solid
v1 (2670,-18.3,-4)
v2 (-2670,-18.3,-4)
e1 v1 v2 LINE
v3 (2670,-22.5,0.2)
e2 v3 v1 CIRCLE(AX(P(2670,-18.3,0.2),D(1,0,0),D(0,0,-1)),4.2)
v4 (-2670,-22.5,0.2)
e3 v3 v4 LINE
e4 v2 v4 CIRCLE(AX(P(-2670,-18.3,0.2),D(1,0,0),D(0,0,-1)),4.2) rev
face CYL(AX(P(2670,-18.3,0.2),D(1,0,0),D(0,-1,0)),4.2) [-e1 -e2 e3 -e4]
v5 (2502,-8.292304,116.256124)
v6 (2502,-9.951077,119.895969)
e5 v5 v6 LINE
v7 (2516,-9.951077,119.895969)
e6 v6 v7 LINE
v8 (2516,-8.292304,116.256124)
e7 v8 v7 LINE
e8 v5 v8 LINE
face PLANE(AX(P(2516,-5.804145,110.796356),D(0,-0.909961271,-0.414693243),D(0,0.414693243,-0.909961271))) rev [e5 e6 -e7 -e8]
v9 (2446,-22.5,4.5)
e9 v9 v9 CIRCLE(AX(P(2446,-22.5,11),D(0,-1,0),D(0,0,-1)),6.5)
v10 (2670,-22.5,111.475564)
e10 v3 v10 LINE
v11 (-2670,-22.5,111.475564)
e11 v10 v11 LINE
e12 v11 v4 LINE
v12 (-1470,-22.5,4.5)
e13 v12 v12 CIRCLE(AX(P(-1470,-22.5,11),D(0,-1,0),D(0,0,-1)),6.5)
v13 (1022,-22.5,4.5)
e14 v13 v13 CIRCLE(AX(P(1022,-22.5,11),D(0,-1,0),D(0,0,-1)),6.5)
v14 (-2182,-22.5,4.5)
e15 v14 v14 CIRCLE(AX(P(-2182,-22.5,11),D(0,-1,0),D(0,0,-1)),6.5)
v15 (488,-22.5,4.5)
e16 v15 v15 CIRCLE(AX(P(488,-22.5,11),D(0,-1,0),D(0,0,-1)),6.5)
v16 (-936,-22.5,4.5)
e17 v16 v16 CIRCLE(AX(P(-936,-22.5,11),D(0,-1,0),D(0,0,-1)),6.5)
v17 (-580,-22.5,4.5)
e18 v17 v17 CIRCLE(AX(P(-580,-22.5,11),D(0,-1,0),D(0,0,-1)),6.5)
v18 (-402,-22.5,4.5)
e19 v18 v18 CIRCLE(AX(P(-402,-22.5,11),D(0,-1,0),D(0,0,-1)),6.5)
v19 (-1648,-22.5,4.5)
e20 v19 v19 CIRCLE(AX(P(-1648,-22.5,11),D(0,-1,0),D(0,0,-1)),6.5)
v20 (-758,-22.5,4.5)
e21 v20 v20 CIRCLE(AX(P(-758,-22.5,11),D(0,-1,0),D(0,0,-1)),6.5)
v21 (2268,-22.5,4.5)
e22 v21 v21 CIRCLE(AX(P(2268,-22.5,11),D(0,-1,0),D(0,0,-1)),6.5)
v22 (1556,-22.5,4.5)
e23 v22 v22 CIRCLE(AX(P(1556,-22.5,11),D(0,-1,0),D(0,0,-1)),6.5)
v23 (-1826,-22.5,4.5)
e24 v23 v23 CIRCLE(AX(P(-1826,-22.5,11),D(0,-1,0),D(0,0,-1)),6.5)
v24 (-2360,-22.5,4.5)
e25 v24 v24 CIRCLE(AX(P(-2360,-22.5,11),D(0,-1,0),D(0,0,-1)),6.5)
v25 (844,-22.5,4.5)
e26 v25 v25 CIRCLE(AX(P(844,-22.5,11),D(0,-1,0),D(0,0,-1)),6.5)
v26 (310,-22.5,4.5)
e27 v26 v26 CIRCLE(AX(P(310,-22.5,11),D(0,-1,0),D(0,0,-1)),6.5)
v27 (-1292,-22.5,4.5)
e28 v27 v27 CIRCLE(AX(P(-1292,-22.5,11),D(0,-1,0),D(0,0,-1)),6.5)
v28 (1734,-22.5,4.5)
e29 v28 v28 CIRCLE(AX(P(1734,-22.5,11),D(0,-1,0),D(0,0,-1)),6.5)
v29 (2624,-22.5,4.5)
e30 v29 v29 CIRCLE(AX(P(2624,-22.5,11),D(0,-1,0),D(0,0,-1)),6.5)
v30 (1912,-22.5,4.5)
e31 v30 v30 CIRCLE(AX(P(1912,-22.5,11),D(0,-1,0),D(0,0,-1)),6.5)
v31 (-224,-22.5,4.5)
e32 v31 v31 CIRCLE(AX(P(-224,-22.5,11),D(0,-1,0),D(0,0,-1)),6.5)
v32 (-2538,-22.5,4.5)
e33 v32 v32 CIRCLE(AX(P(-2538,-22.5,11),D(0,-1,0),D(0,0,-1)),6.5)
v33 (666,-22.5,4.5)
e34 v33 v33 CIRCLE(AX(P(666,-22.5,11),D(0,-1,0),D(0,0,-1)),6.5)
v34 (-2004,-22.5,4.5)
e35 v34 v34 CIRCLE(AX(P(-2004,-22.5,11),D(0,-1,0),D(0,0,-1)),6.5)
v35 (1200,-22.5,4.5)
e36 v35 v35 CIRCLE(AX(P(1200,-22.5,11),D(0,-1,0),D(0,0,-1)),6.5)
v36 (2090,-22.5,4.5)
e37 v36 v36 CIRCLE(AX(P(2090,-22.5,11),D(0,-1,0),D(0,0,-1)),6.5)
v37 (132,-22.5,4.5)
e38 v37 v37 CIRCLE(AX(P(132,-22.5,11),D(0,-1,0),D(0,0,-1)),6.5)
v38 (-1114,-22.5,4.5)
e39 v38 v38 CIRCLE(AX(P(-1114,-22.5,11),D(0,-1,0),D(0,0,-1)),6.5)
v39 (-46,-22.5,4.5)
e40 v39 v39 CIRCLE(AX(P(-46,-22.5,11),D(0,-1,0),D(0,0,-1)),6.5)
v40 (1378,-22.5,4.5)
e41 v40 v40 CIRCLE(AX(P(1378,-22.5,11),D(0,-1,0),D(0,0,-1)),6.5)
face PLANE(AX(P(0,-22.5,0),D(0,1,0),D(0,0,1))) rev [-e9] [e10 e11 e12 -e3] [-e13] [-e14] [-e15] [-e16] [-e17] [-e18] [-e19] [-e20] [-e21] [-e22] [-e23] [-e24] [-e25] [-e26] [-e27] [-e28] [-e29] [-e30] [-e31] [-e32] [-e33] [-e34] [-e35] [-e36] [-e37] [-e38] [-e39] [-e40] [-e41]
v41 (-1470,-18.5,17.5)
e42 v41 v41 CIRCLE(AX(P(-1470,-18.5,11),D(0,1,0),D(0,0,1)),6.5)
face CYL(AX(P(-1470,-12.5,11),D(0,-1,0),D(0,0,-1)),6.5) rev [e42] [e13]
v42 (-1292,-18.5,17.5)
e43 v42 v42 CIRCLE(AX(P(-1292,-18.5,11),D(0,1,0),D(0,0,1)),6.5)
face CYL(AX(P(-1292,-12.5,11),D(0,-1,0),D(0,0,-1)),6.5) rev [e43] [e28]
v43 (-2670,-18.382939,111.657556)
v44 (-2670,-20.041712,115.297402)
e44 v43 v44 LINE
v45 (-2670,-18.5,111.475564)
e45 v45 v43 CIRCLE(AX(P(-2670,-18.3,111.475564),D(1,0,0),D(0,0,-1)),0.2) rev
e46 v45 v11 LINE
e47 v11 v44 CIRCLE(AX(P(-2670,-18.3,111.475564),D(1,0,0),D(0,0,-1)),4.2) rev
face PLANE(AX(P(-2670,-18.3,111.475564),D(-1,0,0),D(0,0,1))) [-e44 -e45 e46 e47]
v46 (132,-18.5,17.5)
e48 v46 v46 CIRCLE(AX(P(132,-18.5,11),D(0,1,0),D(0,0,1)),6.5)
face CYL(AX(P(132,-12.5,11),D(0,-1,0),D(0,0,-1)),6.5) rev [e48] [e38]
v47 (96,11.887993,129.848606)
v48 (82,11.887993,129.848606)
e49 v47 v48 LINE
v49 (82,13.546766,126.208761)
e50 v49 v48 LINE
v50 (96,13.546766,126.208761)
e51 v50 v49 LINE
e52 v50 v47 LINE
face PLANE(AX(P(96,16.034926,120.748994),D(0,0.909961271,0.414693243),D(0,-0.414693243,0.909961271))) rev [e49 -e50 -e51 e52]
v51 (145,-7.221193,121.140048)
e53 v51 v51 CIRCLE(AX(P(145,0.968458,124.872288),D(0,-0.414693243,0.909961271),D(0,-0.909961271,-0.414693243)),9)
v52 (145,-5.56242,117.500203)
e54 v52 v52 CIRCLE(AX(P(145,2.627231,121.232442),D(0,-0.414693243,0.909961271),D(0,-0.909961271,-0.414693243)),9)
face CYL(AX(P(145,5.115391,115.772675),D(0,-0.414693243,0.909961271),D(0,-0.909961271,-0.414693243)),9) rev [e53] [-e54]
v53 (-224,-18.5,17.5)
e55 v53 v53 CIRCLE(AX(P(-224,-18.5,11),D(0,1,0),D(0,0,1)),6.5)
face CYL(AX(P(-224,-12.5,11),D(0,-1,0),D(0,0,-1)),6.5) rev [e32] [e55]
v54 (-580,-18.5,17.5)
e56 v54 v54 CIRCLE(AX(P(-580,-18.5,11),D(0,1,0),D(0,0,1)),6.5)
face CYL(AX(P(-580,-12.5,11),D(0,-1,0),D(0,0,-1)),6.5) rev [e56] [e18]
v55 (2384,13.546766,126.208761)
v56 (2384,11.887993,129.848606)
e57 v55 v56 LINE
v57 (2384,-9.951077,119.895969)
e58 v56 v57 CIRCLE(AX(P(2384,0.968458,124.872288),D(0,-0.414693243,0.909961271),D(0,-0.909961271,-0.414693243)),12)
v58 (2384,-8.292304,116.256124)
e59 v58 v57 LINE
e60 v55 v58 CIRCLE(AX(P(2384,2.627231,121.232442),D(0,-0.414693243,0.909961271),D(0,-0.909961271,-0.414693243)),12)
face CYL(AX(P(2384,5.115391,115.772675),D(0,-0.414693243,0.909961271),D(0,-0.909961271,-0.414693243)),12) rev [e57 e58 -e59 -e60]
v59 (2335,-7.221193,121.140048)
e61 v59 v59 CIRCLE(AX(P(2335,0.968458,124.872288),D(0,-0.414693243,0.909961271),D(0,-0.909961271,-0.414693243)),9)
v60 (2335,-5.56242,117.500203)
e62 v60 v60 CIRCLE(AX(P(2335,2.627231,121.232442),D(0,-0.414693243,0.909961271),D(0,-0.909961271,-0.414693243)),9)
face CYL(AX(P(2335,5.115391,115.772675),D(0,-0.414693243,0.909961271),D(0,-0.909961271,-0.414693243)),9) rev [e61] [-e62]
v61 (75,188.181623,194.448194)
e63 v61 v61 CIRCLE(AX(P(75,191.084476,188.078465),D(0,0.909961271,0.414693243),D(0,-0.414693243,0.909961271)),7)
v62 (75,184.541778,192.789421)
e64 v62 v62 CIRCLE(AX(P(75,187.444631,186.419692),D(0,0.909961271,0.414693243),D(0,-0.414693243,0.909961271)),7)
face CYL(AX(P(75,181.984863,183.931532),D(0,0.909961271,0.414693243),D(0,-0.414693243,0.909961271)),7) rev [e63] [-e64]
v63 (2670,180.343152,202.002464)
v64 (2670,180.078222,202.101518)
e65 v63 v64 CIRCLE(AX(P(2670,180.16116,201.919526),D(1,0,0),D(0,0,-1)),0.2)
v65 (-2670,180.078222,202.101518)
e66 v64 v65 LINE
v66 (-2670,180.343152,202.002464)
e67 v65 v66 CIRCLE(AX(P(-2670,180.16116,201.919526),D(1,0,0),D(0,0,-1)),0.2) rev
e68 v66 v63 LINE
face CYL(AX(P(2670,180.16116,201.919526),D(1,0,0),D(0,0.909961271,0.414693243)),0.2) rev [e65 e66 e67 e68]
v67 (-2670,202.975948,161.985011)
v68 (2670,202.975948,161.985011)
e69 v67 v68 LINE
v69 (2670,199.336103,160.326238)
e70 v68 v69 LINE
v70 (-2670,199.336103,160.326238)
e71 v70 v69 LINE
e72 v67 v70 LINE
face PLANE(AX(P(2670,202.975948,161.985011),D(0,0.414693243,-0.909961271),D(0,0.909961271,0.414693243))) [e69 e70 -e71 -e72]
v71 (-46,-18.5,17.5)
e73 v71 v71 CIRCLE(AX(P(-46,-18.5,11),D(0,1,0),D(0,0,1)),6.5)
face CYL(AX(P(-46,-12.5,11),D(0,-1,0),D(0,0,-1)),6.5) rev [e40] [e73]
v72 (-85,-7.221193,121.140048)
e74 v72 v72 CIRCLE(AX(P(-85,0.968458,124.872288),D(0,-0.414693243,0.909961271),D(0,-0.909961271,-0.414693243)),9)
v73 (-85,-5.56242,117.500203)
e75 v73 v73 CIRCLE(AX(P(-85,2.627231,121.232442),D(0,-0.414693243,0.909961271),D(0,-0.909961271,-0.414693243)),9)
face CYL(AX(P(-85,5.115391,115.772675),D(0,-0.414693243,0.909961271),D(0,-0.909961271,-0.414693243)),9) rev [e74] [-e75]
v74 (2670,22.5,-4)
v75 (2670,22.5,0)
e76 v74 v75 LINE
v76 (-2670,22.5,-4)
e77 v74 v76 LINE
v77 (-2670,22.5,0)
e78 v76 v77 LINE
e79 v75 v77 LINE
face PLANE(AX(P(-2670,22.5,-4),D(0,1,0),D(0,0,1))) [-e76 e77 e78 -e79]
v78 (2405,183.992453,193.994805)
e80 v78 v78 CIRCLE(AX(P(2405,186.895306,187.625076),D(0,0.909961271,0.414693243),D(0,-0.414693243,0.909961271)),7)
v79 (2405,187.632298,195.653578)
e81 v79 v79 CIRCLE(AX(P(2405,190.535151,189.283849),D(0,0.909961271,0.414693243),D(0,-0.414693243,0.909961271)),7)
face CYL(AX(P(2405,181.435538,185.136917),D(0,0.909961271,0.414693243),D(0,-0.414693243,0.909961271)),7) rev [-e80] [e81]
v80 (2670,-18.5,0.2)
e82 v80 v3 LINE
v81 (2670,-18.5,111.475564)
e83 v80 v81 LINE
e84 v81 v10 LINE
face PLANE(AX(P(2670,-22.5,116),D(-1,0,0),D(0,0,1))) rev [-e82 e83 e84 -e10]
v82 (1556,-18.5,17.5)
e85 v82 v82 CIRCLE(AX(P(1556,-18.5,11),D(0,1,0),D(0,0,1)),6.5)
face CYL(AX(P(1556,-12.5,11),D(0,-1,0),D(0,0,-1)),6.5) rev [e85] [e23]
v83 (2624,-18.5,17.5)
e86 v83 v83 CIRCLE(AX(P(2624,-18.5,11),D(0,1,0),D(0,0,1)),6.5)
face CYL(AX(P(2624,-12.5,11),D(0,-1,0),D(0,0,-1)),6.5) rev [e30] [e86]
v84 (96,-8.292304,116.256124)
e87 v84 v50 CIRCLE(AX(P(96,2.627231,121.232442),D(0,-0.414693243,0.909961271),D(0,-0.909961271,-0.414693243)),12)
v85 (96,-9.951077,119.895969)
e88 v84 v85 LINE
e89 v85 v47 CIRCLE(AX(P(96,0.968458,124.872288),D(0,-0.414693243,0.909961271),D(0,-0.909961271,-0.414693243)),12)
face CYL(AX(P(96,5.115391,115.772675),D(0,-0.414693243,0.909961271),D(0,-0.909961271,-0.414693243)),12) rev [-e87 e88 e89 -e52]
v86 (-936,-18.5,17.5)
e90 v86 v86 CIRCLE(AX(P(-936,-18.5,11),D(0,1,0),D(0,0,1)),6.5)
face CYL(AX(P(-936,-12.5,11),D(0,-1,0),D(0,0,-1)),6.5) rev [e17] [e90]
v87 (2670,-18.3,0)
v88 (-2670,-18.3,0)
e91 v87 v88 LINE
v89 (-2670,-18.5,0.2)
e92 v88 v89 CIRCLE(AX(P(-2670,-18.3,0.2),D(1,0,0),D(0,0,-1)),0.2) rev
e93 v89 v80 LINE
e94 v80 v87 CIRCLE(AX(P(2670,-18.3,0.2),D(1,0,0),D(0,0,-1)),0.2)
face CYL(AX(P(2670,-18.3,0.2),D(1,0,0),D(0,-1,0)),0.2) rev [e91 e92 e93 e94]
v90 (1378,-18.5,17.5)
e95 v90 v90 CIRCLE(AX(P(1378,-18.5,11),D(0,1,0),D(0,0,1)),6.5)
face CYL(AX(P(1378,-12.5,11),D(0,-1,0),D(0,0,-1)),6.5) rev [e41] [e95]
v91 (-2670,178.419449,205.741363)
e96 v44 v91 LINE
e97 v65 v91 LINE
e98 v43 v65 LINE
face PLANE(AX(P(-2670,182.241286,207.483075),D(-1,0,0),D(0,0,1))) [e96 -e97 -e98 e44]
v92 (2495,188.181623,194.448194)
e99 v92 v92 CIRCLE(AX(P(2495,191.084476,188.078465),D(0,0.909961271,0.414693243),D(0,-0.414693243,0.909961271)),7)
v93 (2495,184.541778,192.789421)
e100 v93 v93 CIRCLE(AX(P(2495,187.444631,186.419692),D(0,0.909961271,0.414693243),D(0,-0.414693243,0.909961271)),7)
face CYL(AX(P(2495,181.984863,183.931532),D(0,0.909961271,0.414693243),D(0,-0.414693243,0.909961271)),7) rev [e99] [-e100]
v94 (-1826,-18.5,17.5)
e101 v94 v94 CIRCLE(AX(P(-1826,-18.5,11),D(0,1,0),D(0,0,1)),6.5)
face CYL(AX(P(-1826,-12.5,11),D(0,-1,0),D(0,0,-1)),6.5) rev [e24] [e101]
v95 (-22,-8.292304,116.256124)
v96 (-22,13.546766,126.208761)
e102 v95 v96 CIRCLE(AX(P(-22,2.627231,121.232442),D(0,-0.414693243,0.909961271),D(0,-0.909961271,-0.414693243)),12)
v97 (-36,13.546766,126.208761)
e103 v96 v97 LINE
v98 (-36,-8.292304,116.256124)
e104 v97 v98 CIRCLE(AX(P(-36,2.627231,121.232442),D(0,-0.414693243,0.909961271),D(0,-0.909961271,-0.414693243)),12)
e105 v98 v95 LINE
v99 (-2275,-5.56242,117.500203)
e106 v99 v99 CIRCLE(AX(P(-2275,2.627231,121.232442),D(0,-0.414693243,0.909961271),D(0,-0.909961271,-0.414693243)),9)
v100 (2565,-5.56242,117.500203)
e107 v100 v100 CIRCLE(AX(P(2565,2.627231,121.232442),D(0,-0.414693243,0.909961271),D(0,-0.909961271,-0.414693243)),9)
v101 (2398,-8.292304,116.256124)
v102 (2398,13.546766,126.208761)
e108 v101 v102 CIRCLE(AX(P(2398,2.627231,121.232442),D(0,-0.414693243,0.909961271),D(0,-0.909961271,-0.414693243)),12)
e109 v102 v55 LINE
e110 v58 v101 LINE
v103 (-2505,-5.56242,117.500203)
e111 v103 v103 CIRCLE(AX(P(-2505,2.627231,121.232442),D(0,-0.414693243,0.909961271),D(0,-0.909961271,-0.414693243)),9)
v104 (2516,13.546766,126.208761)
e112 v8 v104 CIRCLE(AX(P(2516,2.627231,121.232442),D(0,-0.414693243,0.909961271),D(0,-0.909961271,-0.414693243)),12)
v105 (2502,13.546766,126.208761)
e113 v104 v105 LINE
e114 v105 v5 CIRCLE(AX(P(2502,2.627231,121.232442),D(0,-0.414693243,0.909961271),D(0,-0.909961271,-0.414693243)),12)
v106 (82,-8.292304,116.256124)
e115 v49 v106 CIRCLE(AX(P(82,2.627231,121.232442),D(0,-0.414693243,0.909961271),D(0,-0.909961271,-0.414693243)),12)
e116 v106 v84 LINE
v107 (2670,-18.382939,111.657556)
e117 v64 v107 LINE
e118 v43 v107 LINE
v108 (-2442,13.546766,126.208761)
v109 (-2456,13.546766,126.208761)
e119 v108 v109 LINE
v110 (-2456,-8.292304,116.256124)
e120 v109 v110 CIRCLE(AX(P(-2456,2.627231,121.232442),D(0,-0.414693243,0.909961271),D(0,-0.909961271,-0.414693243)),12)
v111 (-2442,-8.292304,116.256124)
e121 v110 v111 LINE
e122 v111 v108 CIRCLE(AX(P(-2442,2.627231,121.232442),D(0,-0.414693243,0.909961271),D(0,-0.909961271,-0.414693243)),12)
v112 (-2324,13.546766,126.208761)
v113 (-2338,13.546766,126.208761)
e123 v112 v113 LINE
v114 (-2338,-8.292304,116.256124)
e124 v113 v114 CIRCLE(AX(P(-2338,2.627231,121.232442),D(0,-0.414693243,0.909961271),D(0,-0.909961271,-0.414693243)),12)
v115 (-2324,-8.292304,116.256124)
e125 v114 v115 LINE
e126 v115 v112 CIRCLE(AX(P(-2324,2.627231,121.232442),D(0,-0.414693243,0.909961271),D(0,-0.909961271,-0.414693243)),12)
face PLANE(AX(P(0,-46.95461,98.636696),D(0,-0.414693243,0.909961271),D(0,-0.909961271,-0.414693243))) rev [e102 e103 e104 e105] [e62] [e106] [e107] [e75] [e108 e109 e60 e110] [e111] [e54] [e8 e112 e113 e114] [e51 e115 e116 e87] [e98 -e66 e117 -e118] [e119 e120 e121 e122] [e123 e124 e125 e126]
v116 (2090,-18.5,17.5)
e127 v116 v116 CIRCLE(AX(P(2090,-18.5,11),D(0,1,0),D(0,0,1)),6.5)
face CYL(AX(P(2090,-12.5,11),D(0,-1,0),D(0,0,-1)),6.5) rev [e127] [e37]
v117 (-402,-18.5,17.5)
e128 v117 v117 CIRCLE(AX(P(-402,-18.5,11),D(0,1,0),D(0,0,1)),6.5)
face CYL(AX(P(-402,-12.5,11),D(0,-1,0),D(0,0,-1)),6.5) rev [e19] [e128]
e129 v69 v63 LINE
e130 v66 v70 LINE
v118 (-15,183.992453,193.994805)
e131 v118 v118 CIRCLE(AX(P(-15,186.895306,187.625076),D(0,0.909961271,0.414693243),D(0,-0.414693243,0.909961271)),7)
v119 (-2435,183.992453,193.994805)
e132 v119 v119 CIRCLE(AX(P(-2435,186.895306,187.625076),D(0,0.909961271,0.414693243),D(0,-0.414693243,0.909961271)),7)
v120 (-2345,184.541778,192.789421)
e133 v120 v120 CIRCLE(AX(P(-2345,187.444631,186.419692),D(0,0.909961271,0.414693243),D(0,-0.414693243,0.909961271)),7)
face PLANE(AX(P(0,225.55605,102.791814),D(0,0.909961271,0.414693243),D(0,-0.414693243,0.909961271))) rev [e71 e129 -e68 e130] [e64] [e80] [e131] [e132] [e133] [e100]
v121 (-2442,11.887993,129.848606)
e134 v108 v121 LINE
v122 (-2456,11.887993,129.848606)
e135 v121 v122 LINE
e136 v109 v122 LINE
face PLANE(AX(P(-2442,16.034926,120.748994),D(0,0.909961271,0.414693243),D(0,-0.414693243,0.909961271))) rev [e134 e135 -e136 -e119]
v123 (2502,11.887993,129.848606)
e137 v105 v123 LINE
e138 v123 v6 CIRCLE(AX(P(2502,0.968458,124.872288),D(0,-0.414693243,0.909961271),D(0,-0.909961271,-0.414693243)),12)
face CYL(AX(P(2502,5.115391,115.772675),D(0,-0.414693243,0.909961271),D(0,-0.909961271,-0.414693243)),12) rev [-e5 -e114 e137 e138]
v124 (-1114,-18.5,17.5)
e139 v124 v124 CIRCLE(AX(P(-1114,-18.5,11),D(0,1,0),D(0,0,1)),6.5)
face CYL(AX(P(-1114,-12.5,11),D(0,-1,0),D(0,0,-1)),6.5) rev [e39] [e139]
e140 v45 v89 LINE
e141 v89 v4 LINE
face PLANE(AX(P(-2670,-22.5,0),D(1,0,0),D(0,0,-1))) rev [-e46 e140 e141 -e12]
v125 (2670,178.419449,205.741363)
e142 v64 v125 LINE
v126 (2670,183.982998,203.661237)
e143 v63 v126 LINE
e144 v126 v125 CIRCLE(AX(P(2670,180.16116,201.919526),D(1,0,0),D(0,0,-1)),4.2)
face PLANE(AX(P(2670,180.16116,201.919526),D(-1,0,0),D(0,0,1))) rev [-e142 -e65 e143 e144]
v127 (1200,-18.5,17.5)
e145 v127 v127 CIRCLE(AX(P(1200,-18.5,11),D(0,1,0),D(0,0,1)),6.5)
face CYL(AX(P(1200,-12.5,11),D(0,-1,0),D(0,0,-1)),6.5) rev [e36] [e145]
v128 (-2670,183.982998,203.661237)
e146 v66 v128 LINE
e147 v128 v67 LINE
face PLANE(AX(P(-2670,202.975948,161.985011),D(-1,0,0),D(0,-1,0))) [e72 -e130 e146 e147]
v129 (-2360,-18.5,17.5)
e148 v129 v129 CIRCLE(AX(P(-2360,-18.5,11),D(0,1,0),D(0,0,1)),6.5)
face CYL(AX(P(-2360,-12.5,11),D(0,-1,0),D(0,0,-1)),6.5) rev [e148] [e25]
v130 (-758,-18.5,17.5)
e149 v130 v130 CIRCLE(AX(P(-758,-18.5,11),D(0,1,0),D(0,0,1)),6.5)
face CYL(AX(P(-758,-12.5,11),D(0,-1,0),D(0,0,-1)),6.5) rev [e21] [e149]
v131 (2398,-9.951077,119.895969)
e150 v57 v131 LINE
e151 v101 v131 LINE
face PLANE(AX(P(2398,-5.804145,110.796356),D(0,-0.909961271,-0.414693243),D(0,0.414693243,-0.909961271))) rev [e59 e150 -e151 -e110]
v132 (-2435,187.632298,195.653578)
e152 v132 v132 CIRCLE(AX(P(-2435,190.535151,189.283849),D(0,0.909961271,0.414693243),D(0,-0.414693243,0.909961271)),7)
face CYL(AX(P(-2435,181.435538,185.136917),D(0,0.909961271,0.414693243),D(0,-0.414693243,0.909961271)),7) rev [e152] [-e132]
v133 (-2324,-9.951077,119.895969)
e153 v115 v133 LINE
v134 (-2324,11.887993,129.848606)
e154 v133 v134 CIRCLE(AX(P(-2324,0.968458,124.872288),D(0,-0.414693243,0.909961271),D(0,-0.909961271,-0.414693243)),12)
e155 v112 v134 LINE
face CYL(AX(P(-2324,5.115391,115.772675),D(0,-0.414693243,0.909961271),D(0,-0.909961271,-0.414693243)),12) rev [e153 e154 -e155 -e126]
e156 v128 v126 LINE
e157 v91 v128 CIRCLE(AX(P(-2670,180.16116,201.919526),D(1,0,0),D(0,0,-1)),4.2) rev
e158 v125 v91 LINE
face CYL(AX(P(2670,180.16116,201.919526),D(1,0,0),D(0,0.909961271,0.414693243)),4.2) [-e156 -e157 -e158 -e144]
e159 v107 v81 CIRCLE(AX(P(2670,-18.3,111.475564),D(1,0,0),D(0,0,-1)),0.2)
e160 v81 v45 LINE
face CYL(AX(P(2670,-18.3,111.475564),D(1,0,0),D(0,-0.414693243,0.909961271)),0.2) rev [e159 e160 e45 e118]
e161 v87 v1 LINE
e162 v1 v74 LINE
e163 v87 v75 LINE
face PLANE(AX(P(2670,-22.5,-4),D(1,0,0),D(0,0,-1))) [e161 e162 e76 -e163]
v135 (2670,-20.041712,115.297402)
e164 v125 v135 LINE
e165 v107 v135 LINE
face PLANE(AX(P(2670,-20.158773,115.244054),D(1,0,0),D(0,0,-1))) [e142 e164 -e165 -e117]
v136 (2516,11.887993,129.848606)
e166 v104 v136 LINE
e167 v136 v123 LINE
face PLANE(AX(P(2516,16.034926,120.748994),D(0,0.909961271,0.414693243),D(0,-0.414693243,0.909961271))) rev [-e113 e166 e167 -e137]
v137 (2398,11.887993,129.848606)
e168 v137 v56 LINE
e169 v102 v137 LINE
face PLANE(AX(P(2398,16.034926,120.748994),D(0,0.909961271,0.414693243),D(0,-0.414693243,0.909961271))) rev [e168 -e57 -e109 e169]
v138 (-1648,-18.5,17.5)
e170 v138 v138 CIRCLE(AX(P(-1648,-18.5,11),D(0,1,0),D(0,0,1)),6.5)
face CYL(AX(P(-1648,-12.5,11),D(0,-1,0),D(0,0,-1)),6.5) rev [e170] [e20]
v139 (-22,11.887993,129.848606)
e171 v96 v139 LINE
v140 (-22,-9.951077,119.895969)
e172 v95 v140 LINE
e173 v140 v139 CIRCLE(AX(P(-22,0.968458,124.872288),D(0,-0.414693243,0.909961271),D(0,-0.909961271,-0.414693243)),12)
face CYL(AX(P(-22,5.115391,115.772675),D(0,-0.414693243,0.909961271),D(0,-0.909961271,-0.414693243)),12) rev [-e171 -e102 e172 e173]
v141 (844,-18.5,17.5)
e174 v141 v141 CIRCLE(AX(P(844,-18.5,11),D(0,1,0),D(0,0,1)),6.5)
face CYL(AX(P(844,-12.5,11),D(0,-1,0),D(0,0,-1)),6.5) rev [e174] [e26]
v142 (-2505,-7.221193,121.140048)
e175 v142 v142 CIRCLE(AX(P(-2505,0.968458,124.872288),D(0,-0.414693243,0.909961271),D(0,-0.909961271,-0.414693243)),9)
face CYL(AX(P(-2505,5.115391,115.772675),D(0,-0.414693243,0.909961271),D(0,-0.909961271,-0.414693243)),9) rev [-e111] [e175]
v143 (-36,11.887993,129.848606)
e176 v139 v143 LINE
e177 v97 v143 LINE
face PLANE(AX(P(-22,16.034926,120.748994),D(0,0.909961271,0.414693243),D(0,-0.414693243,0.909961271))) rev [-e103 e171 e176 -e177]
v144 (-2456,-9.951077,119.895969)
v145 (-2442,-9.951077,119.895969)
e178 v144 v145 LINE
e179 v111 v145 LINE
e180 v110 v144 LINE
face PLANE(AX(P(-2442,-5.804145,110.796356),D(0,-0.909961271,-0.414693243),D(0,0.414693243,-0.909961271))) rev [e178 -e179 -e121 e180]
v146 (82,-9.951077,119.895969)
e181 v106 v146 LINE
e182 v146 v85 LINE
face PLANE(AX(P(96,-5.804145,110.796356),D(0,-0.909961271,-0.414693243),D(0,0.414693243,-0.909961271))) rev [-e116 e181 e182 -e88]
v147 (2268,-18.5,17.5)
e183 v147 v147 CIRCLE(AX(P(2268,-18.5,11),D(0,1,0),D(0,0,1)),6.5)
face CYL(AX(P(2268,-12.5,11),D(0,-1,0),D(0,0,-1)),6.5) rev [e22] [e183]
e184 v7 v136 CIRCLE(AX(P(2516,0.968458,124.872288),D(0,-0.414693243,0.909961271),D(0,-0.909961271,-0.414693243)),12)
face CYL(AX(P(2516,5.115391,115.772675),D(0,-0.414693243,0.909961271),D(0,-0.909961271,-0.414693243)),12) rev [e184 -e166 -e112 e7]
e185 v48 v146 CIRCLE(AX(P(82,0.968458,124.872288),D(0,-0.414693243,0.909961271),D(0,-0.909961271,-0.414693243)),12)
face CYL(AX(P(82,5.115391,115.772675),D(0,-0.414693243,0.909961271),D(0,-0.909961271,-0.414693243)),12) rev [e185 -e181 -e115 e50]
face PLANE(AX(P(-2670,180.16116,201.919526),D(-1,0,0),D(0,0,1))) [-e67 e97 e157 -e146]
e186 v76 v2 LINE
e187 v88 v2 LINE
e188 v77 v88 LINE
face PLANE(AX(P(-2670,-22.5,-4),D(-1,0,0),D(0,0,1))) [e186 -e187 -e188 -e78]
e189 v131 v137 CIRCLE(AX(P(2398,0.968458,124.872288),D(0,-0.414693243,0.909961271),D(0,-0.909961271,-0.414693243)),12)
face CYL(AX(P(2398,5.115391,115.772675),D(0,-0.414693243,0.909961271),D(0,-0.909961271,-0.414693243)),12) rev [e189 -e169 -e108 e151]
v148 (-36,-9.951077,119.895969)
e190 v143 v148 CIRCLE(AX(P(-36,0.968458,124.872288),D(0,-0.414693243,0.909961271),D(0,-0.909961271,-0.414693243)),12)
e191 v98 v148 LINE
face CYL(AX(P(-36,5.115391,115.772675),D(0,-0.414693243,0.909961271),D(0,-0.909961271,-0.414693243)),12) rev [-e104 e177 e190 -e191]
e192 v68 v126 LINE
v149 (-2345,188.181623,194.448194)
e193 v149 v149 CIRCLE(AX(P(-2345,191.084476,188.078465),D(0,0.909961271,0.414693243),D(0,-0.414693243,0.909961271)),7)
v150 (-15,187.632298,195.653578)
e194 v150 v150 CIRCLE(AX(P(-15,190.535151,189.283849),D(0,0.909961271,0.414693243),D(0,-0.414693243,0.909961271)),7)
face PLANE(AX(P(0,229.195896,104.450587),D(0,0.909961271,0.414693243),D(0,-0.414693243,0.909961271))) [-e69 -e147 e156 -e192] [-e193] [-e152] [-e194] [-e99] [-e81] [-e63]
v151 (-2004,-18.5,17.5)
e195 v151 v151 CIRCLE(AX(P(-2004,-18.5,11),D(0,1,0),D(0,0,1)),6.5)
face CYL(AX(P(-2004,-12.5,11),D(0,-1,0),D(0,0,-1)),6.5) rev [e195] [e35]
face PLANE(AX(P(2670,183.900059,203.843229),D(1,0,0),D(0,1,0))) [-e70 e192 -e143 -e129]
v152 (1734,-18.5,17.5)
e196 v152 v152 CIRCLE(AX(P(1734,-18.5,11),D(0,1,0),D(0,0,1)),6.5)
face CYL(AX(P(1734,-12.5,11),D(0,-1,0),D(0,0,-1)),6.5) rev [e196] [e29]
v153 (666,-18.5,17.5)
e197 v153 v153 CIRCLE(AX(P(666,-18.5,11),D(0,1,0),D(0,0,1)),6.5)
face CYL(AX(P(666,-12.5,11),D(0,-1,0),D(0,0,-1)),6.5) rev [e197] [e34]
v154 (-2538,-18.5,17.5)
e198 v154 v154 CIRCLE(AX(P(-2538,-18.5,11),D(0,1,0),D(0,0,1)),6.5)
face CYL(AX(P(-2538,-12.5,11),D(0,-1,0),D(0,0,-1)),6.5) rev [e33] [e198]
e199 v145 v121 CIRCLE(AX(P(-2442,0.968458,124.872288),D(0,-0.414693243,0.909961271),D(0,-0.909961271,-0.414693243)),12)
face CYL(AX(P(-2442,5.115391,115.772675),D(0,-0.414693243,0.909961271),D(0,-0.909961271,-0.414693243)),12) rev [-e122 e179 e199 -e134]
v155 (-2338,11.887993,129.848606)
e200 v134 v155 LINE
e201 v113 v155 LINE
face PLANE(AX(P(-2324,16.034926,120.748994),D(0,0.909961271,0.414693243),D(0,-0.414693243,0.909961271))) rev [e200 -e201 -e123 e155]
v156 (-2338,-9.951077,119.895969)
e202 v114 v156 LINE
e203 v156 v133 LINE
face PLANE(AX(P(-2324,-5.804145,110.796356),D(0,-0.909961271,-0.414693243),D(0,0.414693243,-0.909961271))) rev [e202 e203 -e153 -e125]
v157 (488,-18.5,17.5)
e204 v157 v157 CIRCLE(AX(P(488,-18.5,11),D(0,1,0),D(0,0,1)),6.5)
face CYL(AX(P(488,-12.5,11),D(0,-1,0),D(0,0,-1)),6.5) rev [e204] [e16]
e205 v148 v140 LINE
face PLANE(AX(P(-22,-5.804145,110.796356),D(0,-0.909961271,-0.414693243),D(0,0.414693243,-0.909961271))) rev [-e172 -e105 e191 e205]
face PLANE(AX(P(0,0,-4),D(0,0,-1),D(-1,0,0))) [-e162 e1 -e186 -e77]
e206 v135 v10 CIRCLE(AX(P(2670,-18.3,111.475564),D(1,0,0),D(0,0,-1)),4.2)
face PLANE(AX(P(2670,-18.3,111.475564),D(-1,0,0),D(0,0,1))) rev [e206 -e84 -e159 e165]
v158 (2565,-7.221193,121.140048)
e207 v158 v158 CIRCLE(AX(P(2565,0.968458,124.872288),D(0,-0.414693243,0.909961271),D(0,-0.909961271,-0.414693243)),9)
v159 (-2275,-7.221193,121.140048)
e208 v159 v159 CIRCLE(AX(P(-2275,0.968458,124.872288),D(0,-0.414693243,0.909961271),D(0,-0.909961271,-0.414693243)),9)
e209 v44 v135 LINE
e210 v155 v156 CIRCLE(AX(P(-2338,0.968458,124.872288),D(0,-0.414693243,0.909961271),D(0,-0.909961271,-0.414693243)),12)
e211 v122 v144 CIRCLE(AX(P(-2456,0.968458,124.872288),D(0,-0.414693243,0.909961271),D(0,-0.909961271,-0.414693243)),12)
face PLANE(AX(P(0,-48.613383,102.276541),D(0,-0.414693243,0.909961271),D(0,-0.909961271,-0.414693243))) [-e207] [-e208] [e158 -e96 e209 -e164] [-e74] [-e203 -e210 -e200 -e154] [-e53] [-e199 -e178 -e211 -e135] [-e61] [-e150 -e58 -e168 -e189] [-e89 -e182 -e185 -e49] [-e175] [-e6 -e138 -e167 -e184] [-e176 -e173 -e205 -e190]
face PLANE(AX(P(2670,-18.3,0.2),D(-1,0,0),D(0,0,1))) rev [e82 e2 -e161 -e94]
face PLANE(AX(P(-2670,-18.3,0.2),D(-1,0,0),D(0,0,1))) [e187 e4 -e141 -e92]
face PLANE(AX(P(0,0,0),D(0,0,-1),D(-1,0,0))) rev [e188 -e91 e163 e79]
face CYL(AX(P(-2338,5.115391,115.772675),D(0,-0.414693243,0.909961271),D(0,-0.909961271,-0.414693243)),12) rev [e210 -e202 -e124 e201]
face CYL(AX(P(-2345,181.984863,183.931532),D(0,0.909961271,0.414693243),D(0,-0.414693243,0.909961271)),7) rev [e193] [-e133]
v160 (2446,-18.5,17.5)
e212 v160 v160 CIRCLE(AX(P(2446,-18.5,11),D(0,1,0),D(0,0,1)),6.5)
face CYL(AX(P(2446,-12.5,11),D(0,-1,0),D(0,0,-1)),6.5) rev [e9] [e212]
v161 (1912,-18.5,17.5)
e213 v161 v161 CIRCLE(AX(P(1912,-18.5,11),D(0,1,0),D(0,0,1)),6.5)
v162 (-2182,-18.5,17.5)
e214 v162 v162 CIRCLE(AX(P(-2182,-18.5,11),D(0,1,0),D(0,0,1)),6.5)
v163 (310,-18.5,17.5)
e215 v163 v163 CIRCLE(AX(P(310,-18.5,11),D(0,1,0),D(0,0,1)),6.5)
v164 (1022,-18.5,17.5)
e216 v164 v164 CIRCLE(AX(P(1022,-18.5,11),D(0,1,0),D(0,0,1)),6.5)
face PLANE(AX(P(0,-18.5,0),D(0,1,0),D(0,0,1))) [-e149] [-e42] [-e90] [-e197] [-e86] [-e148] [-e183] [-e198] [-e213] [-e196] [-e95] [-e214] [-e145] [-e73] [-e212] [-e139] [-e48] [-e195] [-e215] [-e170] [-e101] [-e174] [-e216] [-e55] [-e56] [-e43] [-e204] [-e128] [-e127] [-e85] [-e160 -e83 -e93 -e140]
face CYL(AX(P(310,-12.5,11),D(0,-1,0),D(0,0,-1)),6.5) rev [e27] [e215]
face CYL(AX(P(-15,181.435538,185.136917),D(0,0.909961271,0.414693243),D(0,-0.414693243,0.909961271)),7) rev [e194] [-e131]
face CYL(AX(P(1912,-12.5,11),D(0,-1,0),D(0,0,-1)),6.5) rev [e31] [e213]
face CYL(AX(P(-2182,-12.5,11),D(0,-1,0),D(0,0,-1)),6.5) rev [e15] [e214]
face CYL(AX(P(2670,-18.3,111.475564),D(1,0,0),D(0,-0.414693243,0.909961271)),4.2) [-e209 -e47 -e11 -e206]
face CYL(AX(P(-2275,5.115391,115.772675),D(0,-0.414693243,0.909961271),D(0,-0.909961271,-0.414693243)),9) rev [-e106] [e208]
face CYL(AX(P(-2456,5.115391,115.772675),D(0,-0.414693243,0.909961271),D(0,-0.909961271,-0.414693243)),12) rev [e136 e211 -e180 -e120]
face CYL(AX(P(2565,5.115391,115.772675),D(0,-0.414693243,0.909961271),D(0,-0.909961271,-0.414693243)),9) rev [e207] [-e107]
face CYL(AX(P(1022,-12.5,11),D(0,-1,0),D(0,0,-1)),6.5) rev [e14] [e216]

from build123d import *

# Parameters (mm, degrees)
SKETCH1_W                    = 5340
SKETCH1_H                    = 45
BASE_FLANGE1_DEPTH           = 4
EDGE_FLANGE1_STRIP_W         = 16.4
EDGE_FLANGE1_STRIP_H         = 4
EDGE_FLANGE1_STRIP_CUT_DEPTH = 5340
EDGE_FLANGE1_DEPTH           = 5340
EDGE_FLANGE2_START           = -2670
EDGE_FLANGE2_DEPTH           = 5340
EDGE_FLANGE2_2_DEPTH         = 5340
EDGE_FLANGE3_STRIP_W         = 16.4
EDGE_FLANGE3_STRIP_H         = 4
EDGE_FLANGE3_STRIP_CUT_DEPTH = 5340
EDGE_FLANGE3_DEPTH           = 5340
SKETCH15_R                   = 7
CUT_EXTRUDE1_DEPTH           = 10
SKETCH17_R                   = 6.5
CUT_EXTRUDE3_DEPTH           = 10
LPATTERN1_COUNT              = 30
LPATTERN1_PITCH              = 178
SKETCH18_R                   = 9
CUT_EXTRUDE4_DEPTH           = 10
LPATTERN2_COUNT              = 3
LPATTERN2_PITCH              = 2420
LPATTERN3_COUNT              = 3
LPATTERN3_PITCH              = 2420


# Read off the part's stored shape, not the designer's step: Edge-Flange2
# Sheet-metal steps are written as plain solids
with BuildPart() as part:
    # Sketch1 → Base-Flange1 (new body)
    with BuildSketch(Plane.XY):
        Rectangle(SKETCH1_W, SKETCH1_H)
    extrude(amount=-BASE_FLANGE1_DEPTH)

    # Edge-Flange1 strip (across the edge) → Edge-Flange1 strip cut (cut)
    with BuildSketch(Plane(origin=(-2670, -22.5, 0), x_dir=(0, 1, 0), z_dir=(1, 0, 0))):
        with Locations((-4, -2)):
            Rectangle(EDGE_FLANGE1_STRIP_W, EDGE_FLANGE1_STRIP_H)
    extrude(amount=EDGE_FLANGE1_STRIP_CUT_DEPTH, mode=Mode.SUBTRACT)

    # Edge-Flange1 section (across the edge) → Edge-Flange1 (add)
    with BuildSketch(Plane(origin=(-2670, -22.5, 0), x_dir=(0, 1, 0), z_dir=(1, 0, 0))):
        with BuildLine():
            Line((0, 0.2), (0, 116))
            Line((0, 116), (4, 116))
            Line((4, 116), (4, 0.2))
            ThreePointArc((4, 0.2), (4.058578644, 0.058578644), (4.2, 0))
            Line((4.2, 0), (4.2, -4))
            ThreePointArc((4.2, -4), (1.230151519, -2.769848481), (0, 0.2))
        make_face()
    extrude(amount=EDGE_FLANGE1_DEPTH)

    # Edge-Flange2 outline → Edge-Flange2 (cut)
    with BuildSketch(Plane.YZ.offset(EDGE_FLANGE2_START)):
        with BuildLine():
            ThreePointArc((-22.5, 111.475564199), (-21.832363854, 113.747656979), (-20.041711619, 115.297401537))
            Line((-20.041711619, 115.297401537), (-18.5, 116))
            Line((-18.5, 116), (-22.5, 116))
            Line((-22.5, 116), (-22.5, 111.475564199))
        make_face()
    extrude(amount=EDGE_FLANGE2_DEPTH, mode=Mode.SUBTRACT)

    # Edge-Flange2 2 outline → Edge-Flange2 2 (add)
    with BuildSketch(Plane.YZ.offset(EDGE_FLANGE2_START)):
        with BuildLine():
            Line((182.241285947, 207.483074576), (-18.5, 116))
            Line((-18.5, 116), (-18.5, 111.475564199))
            ThreePointArc((-18.5, 111.475564199), (-18.468207803, 111.583759093), (-18.382938649, 111.657556453))
            Line((-18.382938649, 111.657556453), (183.900058918, 203.843229492))
            Line((183.900058918, 203.843229492), (182.241285947, 207.483074576))
        make_face()
    extrude(amount=EDGE_FLANGE2_2_DEPTH)

    # Edge-Flange3 strip (across the edge) → Edge-Flange3 strip cut (cut)
    with BuildSketch(Plane(origin=(-2670, 183.900058918, 203.843229492), x_dir=(0, -0.9099612708765384, -0.41469324265624946), z_dir=(1, 0, 0))):
        with Locations((-4, -2)):
            Rectangle(EDGE_FLANGE3_STRIP_W, EDGE_FLANGE3_STRIP_H)
    extrude(amount=EDGE_FLANGE3_STRIP_CUT_DEPTH, mode=Mode.SUBTRACT)

    # Edge-Flange3 section (across the edge) → Edge-Flange3 (add)
    with BuildSketch(Plane(origin=(-2670, 183.900058918, 203.843229492), x_dir=(0, -0.9099612708765384, -0.41469324265624946), z_dir=(1, 0, 0))):
        with BuildLine():
            Line((0, 0.2), (0, 46))
            Line((0, 46), (4, 46))
            Line((4, 46), (4, 0.2))
            ThreePointArc((4, 0.2), (4.058578644, 0.058578644), (4.2, 0))
            Line((4.2, 0), (4.2, -4))
            ThreePointArc((4.2, -4), (1.230151519, -2.769848481), (0, 0.2))
        make_face()
    extrude(amount=EDGE_FLANGE3_DEPTH)

    # Sketch15 → Cut-Extrude1 (cut)
    with BuildSketch(Plane(origin=(0, 229.195895582, 104.450587277), x_dir=(1, 0, 0), z_dir=(0, 0.9099612708765383, 0.41469324265624985))):
        with Locations(Location((-2435, -93.227332411, 0), (0, 0, 270))):
            Circle(SKETCH15_R)
        with Locations(Location((-2345, -91.902677897, 0), (0, 0, 270))):
            Circle(SKETCH15_R)
    cut_extrude1 = extrude(amount=-CUT_EXTRUDE1_DEPTH, mode=Mode.SUBTRACT)

    # Sketch17 → Cut-Extrude3 (cut)
    with BuildSketch(Plane.XZ.offset(22.5)):
        with Locations(Location((-2538, 11, 0), (0, 0, 270))):
            Circle(SKETCH17_R)
    cut_extrude3 = extrude(amount=-CUT_EXTRUDE3_DEPTH, mode=Mode.SUBTRACT)

    # LPattern1: Cut-Extrude3 ×30
    with Locations(*[(i * LPATTERN1_PITCH, 0, 0) for i in range(1, LPATTERN1_COUNT)]):
        add(cut_extrude3, mode=Mode.SUBTRACT)

    # Sketch18 → Cut-Extrude4 (cut)
    with BuildSketch(Plane(origin=(0, -46.954609635, 103.032487299), x_dir=(1, 0, 0), z_dir=(0, -0.4146932426562464, 0.90996127087654))):
        with Locations(Location((-2275, 52.664953269, 0), (0, 0, 270))):
            Circle(SKETCH18_R)
        with Locations(Location((-2505, 52.664953269, 0), (0, 0, 270))):
            Circle(SKETCH18_R)
        with BuildLine():
            Line((-2324, 40.664953269), (-2338, 40.664953269))
            ThreePointArc((-2338, 40.664953269), (-2350, 52.664953269), (-2338, 64.664953269))
            Line((-2338, 64.664953269), (-2324, 64.664953269))
            ThreePointArc((-2324, 64.664953269), (-2312, 52.664953269), (-2324, 40.664953269))
        make_face()
        with BuildLine():
            Line((-2442, 40.664953269), (-2456, 40.664953269))
            ThreePointArc((-2456, 40.664953269), (-2468, 52.664953269), (-2456, 64.664953269))
            Line((-2456, 64.664953269), (-2442, 64.664953269))
            ThreePointArc((-2442, 64.664953269), (-2430, 52.664953269), (-2442, 40.664953269))
        make_face()
    cut_extrude4 = extrude(amount=-CUT_EXTRUDE4_DEPTH, mode=Mode.SUBTRACT)

    # LPattern2: Cut-Extrude1 ×3
    with Locations(*[(i * LPATTERN2_PITCH, 0, 0) for i in range(1, LPATTERN2_COUNT)]):
        add(cut_extrude1, mode=Mode.SUBTRACT)

    # LPattern3: Cut-Extrude4 ×3
    with Locations(*[(i * LPATTERN3_PITCH, 0, 0) for i in range(1, LPATTERN3_COUNT)]):
        add(cut_extrude4, mode=Mode.SUBTRACT)


solid = part.part
